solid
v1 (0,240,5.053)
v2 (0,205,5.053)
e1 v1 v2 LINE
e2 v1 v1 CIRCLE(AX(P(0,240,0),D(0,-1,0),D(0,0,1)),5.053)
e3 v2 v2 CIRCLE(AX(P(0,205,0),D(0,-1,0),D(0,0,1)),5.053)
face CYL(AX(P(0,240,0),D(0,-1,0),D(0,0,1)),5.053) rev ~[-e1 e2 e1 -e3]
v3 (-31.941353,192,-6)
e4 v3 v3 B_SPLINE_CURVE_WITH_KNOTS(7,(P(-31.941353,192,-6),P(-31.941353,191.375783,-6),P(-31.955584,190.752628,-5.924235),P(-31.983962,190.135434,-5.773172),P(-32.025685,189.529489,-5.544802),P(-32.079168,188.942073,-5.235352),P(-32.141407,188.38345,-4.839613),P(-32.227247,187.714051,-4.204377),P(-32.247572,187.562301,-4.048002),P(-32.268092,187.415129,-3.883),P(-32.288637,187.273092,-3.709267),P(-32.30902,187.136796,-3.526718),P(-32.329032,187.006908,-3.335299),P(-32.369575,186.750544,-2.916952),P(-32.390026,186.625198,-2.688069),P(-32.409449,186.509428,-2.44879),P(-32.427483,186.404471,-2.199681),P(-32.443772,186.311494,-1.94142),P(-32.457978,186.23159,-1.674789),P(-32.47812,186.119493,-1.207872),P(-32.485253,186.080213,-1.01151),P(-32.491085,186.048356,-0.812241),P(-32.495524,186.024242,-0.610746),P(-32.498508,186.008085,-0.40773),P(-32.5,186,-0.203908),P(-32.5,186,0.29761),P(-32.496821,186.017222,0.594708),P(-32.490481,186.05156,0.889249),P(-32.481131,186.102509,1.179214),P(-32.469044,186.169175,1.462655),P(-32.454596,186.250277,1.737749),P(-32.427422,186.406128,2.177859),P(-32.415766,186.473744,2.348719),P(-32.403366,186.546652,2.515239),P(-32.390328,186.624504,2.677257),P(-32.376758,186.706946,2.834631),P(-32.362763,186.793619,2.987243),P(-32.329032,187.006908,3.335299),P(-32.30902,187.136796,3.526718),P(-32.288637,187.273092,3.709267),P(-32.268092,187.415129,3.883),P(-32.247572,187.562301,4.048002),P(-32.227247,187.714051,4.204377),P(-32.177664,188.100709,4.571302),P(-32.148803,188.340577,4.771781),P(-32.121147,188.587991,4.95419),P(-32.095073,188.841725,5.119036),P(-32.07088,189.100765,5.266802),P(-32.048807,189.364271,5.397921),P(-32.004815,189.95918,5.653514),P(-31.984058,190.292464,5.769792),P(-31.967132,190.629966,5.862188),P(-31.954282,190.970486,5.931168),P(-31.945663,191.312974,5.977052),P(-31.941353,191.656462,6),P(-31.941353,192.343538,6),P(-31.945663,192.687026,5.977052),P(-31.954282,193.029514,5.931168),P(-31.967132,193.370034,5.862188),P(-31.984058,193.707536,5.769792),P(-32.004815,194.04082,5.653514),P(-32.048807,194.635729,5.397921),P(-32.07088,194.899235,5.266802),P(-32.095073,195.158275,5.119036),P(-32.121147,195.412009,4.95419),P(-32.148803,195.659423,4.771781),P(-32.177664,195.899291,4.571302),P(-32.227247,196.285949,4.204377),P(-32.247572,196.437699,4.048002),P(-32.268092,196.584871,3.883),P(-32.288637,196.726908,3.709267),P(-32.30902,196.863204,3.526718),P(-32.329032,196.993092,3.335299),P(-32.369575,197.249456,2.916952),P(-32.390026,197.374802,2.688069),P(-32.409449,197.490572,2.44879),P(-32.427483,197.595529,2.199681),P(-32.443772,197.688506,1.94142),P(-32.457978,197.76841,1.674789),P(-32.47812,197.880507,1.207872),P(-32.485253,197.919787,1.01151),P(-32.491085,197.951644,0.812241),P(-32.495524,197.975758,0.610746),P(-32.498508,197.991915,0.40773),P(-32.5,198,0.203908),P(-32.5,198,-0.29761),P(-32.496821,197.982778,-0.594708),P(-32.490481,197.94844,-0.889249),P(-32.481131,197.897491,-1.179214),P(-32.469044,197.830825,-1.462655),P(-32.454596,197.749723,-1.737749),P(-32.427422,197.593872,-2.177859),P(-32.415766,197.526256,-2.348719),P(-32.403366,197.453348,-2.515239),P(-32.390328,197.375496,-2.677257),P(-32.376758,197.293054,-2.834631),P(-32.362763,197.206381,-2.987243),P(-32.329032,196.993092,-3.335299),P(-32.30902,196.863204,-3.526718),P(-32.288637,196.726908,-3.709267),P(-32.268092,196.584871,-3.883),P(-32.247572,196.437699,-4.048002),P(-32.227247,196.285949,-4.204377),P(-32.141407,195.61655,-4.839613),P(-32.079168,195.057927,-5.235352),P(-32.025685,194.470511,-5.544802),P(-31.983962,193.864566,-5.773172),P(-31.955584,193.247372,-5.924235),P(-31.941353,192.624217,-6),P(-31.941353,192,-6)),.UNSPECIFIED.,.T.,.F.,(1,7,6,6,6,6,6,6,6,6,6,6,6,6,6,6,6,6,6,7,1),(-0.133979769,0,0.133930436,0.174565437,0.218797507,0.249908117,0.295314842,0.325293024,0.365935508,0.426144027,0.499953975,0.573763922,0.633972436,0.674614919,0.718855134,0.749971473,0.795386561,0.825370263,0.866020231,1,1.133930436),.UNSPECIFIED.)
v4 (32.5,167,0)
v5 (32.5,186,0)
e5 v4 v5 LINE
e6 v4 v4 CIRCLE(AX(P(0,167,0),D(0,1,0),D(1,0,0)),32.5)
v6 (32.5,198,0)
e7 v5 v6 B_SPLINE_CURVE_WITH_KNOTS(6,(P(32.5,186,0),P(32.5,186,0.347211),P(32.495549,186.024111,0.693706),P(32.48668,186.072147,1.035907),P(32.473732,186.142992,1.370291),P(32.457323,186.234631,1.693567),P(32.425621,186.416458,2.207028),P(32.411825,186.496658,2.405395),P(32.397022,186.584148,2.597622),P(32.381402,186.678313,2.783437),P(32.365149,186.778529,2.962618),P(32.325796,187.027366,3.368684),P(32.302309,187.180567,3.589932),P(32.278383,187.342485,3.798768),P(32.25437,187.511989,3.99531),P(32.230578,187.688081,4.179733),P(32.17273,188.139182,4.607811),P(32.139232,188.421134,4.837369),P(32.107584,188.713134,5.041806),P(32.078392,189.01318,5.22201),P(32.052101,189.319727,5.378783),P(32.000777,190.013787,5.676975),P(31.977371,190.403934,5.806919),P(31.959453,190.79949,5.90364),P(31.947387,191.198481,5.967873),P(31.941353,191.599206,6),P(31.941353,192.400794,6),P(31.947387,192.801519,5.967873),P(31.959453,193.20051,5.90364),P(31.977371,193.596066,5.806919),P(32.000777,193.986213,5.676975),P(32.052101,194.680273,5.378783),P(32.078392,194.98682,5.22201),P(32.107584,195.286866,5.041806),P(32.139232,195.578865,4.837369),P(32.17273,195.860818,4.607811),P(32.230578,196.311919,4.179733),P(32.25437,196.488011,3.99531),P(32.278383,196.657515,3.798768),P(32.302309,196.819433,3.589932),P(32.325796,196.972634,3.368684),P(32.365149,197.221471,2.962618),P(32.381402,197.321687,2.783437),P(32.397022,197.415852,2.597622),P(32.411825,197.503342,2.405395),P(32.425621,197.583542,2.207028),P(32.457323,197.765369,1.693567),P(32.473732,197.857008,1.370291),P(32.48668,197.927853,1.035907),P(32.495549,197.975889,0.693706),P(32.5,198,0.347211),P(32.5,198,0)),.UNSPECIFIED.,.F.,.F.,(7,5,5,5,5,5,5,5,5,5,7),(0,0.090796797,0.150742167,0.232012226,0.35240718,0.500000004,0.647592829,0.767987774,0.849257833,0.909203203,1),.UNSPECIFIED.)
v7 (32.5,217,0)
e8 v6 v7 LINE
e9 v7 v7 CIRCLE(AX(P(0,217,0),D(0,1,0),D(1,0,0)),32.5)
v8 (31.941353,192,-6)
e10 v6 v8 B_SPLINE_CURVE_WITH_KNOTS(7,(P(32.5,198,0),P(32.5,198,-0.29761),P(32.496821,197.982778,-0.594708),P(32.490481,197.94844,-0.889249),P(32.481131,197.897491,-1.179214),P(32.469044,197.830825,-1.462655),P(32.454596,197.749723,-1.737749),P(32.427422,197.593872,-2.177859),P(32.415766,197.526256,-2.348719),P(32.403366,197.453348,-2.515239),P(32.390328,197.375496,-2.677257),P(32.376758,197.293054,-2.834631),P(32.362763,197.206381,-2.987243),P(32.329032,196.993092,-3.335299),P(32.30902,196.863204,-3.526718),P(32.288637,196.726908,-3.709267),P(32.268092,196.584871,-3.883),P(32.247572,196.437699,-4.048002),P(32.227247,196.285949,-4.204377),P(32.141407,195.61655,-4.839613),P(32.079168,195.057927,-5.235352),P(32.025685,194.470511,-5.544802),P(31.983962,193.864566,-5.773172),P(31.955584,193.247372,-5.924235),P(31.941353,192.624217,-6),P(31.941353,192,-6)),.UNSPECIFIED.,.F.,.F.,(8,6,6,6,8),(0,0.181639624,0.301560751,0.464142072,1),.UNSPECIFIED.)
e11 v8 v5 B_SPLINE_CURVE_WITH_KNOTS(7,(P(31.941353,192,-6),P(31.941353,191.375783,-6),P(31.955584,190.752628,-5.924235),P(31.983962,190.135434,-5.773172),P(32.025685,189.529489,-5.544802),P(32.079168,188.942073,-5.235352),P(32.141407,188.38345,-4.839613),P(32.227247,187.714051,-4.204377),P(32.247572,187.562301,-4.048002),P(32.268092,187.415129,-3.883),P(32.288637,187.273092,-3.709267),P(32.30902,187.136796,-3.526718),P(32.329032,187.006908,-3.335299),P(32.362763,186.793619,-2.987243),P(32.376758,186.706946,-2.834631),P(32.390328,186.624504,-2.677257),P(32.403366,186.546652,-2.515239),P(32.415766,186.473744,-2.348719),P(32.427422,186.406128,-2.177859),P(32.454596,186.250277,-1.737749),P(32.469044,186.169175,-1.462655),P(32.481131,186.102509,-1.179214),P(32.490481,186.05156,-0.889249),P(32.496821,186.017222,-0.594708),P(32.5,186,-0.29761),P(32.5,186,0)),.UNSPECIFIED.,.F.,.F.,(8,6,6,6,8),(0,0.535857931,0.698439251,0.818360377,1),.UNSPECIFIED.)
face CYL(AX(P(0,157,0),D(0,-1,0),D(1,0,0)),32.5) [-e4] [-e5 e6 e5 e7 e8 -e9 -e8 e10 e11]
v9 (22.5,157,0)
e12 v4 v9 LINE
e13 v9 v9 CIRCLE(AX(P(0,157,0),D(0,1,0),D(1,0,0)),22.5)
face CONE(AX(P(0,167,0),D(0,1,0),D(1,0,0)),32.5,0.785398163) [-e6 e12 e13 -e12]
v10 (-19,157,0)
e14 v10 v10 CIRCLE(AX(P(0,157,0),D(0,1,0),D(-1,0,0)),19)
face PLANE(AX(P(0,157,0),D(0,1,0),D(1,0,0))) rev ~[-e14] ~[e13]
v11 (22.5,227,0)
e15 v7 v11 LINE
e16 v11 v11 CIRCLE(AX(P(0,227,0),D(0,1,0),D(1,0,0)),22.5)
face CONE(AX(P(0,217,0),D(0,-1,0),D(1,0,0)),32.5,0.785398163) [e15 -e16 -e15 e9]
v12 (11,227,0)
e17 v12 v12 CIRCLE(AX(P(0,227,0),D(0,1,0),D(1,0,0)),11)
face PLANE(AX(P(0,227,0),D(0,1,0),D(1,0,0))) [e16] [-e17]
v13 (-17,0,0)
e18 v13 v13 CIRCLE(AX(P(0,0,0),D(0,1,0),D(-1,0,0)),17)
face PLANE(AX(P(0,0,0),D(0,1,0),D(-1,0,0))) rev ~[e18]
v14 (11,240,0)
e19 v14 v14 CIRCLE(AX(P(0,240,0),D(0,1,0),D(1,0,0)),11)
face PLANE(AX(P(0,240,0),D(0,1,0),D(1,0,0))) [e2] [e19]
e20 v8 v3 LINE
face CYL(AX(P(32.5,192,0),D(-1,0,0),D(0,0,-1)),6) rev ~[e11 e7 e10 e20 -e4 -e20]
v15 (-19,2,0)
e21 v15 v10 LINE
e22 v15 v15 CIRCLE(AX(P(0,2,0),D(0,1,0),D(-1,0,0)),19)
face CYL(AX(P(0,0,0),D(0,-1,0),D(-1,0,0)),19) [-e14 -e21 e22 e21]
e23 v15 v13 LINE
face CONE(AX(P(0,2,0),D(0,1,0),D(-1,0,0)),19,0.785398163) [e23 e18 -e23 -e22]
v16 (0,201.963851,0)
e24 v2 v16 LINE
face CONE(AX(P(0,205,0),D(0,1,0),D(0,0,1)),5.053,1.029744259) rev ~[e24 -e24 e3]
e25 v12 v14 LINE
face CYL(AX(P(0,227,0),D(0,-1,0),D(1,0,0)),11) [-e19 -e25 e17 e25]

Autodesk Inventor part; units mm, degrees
ref_plane "XZ Plane" through (0, 0, 0) normal (0, 1, 0) x (-1, 0, 0)
ref_plane "XY Plane" through (0, 0, 0) normal (0, 0, 1) x (1, 0, 0)
sketch "Sketch1" plane through (0, 0, 0) normal (0, 1, 0) x (-1, 0, 0)
  circle A0 centre (0, 0) radius 19
  dimension "d0" = 38
extrude "Extrusion1" add sketch "Sketch1" along normal blind 157
sketch "Sketch2" plane through (0, 157, 0) normal (0, 1, 0) x (1, 0, 0)
  circle A0 centre (0, 0) radius 32.5
  dimension "d3" = 65
extrude "Extrusion2" add sketch "Sketch2" along normal blind 70
sketch "Sketch3" plane through (0, 227, 0) normal (0, 1, 0) x (1, 0, 0)
  circle A0 centre (0, 0) radius 11
  dimension "d6" = 22
extrude "Extrusion3" add sketch "Sketch3" along normal blind 13
chamfer "Chamfer1" distance 10 angle 45 2 edges at (-32.5, 227, 0) (-32.5, 157, 0)
chamfer "Chamfer2" distance 2 angle 45 1 edges at (19, 0, 0)
thread "Thread1" size "M38x1.5" class "6g" standard "ISO Metric profile" length 155 offset 3
sketch "Sketch5" plane through (0, 240, 0) normal (0, 1, 0) x (1, 0, 0)
  point P0 (0, 0)
  point P1 (0, 0)
hole "Hole1" at (0, 240, 0) direction (0, -1, 0) diameter 10.106 depth 35 tip angle 118 thread size "M12x1.75" class "6H" standard "ISO Metric profile"
ref_plane "Work Plane1" through (32.5, 157, 0) normal (1, 0, 0) x (0, 1, 0)
sketch "Sketch8" plane through (32.5, 157, 0) normal (1, 0, 0) x (0, 1, 0)
  line L0 (60, -32.5) -> (60, 32.5) projected
  line L1 (10, -32.5) -> (60, -32.5) projected
  line L2 (10, 32.5) -> (10, -32.5) projected
  line L3 (10, 32.5) -> (60, 32.5) projected
  line L4 (60, 32.5) -> (10, -32.5) construction
  line L5 (60, -32.5) -> (10, 32.5) construction
  point P0 (-157, 0)
  point P1 (35, 0)
hole "Hole3" at (32.5, 192, 0) direction (-1, 0, 0) diameter 12 end through all
properties part number "screw.spindle" material "Steel, High Strength, Low Alloy"
